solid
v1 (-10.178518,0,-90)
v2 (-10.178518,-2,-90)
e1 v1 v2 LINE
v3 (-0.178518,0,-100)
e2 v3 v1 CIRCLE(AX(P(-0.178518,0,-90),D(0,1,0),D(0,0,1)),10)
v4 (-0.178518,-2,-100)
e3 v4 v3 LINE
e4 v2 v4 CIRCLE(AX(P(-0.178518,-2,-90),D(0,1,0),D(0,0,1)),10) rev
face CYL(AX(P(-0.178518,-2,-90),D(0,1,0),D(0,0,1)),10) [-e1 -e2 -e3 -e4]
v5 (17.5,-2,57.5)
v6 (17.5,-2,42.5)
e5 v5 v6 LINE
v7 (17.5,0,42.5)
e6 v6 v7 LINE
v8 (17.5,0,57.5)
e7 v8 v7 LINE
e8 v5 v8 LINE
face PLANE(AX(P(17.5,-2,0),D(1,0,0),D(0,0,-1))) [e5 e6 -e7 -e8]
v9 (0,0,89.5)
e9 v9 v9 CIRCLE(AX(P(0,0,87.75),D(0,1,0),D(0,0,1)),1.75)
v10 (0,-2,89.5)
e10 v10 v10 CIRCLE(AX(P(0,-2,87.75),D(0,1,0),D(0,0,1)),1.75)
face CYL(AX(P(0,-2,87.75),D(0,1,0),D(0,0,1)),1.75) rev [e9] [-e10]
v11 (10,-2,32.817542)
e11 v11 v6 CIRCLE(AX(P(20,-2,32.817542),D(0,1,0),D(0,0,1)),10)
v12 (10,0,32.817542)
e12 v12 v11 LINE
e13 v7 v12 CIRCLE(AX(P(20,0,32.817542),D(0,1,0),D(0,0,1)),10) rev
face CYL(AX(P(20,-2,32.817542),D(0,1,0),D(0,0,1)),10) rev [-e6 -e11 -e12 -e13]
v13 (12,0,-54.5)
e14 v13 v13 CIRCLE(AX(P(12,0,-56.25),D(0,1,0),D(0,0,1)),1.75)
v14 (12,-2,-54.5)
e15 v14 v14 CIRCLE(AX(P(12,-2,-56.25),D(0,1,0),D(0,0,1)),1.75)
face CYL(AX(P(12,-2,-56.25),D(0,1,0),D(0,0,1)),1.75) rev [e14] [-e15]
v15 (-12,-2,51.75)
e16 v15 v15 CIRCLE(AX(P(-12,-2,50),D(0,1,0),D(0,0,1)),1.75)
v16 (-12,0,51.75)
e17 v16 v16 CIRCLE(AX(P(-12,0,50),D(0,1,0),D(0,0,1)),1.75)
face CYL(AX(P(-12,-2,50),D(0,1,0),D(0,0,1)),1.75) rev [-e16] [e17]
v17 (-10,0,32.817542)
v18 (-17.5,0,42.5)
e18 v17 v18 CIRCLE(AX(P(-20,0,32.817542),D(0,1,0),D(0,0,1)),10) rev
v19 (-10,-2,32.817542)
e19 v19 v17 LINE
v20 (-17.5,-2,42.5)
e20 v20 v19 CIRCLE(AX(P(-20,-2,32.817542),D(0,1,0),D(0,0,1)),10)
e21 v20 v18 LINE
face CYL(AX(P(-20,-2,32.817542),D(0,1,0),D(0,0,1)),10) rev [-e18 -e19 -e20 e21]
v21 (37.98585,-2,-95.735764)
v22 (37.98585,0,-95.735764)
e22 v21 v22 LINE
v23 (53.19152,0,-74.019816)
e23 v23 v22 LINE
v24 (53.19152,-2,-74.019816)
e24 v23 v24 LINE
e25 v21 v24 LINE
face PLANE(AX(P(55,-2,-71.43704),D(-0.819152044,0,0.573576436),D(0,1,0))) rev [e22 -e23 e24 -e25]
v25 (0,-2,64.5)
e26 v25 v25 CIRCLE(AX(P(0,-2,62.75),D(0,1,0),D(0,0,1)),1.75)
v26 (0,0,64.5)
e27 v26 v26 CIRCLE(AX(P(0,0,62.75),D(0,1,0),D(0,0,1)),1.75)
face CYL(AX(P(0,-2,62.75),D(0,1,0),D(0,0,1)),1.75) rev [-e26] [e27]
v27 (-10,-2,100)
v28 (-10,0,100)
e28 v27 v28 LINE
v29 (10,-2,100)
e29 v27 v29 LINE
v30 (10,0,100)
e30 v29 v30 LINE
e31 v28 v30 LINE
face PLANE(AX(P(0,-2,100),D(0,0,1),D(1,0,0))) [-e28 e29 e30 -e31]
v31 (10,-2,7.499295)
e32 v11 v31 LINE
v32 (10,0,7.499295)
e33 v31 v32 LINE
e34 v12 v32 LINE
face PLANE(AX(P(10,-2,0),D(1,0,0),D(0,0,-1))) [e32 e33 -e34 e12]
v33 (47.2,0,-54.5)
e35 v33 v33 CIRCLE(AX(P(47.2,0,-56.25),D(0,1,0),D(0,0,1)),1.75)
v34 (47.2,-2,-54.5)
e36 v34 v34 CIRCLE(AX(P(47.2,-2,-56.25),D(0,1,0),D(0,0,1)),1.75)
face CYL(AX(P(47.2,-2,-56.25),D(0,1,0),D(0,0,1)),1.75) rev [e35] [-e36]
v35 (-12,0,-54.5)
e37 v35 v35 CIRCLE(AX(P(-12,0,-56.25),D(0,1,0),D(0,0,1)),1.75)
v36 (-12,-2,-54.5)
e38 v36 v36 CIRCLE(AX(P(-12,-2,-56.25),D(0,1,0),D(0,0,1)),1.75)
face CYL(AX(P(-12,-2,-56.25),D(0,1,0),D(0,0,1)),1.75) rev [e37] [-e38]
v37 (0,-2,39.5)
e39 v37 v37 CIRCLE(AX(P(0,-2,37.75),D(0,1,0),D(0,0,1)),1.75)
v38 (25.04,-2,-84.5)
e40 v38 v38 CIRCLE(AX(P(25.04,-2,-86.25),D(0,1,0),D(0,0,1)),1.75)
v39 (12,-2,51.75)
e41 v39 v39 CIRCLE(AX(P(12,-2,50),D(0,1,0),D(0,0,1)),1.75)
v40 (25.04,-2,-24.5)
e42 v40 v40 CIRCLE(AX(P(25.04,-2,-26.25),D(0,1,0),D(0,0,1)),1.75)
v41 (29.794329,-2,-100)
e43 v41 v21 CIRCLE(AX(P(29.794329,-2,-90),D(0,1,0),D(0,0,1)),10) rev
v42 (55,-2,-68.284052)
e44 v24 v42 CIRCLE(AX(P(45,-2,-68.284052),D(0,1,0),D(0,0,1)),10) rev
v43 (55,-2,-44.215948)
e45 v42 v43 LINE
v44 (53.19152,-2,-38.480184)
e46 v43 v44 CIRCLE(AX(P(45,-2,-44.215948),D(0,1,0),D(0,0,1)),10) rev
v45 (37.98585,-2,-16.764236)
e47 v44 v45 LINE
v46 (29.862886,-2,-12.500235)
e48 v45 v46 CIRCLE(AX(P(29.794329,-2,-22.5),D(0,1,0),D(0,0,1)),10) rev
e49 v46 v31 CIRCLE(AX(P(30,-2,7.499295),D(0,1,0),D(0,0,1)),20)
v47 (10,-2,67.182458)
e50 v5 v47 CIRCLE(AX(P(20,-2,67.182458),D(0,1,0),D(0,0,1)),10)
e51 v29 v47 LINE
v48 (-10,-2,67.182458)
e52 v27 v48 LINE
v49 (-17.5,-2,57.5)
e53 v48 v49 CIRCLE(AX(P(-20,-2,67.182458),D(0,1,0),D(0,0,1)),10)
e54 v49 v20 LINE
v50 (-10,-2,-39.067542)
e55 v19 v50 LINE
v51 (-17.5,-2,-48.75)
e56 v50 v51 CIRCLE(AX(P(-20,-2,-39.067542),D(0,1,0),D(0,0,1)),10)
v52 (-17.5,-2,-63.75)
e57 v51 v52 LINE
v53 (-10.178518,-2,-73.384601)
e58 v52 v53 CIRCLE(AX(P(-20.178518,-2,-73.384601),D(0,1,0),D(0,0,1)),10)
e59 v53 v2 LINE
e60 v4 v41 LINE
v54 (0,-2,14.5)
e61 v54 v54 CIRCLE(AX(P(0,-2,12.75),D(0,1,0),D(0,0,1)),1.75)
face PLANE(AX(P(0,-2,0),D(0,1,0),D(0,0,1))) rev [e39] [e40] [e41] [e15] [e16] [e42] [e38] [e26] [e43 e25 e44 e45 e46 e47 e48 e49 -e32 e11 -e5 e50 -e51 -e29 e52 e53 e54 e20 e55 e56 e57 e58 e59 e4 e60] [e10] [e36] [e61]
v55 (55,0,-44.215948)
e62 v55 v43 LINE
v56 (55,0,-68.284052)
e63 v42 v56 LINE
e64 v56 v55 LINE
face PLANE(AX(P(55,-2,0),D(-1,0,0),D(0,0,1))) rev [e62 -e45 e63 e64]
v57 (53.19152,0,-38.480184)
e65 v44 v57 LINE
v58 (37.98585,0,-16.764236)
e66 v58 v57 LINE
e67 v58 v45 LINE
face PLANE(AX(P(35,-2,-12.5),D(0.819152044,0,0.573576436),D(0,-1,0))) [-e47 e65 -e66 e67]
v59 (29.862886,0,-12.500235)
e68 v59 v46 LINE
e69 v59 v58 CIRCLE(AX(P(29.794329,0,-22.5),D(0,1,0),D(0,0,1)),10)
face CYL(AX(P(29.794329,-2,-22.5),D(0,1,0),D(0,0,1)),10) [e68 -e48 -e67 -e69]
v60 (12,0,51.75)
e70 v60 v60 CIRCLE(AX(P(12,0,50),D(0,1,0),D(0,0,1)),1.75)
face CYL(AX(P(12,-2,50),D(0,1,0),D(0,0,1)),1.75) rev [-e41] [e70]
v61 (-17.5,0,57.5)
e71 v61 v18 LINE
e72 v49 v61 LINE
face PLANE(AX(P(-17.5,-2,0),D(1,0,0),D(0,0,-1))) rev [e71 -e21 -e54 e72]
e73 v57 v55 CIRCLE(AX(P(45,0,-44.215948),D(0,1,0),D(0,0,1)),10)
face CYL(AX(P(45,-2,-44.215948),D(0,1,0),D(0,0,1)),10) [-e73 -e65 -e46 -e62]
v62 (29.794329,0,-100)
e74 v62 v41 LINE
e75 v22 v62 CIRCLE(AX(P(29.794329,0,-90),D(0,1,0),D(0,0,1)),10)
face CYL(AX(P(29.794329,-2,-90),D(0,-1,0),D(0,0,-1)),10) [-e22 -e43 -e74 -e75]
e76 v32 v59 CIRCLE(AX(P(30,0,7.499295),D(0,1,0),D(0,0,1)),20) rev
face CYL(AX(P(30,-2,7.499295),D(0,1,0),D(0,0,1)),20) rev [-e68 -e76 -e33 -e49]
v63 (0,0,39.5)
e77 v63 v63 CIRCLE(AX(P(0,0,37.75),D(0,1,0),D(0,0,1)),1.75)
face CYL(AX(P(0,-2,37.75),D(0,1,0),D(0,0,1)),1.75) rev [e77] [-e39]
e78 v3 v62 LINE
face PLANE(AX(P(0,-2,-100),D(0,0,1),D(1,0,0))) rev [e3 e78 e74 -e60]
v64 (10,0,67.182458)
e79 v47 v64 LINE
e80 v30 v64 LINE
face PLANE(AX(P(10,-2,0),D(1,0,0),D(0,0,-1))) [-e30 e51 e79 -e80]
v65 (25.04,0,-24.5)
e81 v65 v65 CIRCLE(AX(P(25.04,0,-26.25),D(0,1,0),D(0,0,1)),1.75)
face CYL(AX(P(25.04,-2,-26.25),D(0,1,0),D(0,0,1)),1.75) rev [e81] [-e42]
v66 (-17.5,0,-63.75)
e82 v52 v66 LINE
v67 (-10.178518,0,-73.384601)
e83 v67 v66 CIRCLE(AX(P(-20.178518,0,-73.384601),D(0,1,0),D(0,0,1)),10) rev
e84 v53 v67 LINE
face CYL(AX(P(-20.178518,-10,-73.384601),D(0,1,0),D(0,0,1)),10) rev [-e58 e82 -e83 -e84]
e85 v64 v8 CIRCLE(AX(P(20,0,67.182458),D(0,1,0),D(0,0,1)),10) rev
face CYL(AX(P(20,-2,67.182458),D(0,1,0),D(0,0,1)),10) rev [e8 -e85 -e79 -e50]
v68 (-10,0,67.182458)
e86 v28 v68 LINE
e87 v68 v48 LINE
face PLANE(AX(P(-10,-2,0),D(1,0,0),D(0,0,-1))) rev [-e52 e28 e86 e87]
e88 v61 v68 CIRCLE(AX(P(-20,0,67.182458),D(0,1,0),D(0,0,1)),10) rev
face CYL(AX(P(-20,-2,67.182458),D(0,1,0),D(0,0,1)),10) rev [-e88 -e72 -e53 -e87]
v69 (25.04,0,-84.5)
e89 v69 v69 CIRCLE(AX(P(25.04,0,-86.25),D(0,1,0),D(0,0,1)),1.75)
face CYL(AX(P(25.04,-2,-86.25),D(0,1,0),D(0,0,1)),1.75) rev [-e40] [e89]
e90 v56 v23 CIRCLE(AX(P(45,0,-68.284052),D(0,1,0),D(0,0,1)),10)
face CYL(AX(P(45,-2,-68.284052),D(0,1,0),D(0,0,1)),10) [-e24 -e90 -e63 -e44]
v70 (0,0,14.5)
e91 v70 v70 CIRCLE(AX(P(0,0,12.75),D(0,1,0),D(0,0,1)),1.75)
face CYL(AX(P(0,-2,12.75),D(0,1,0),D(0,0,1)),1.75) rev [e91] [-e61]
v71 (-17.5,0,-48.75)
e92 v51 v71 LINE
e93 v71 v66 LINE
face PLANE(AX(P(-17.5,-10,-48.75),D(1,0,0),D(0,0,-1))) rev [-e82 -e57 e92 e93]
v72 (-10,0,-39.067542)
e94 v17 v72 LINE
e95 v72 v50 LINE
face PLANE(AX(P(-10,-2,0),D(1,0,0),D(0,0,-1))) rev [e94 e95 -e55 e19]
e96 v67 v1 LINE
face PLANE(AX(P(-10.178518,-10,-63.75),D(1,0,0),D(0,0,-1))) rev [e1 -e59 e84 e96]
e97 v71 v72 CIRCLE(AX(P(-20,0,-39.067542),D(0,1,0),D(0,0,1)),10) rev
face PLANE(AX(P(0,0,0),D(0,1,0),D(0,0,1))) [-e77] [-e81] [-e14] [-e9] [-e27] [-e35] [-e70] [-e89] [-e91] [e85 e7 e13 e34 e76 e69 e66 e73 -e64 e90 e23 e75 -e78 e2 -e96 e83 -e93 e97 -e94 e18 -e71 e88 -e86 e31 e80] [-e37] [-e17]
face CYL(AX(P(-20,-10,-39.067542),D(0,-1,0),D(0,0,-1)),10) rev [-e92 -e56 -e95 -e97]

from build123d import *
from OCP.BRepFilletAPI import BRepFilletAPI_MakeChamfer

# Parameters (mm, degrees)
SCHIZZO1_R                   = 1.75
ESTRUSIONE_ESTRUSIONE1_DEPTH = 2
SMUSSO1_SIZE                 = 20
SMUSSO1_SIZE2                = 28.562960135
TAGLIO_ESTRUSIONE1_DEPTH     = 10
RACCORDO1_R                  = 10
RACCORDO2_R                  = 20


with BuildPart() as part:
    # Schizzo1 → Estrusione-Estrusione1 (new body)
    with BuildSketch(Plane(origin=(0, 0, 0), x_dir=(1, 0, 0), z_dir=(0, 1, 0))):
        Polygon((-10, -57.5), (-10, -100), (10, -100), (10, -57.5), (17.5, -57.5), (17.5, -42.5), (10, -42.5), (10, 12.5), (55, 12.5), (55, 100), (10, 100), (-10, 100), (-30, 100), (-30, 12.5), (-10, 12.5), (-10, -42.5), (-17.5, -42.5), (-17.5, -57.5), align=None)
        with Locations(Location((0, -87.75, 0), (0, 0, 270))):
            Circle(SCHIZZO1_R, mode=Mode.SUBTRACT)
        with Locations(Location((0, -62.75, 0), (0, 0, 270))):
            Circle(SCHIZZO1_R, mode=Mode.SUBTRACT)
        with Locations(Location((-12, -50, 0), (0, 0, 270))):
            Circle(SCHIZZO1_R, mode=Mode.SUBTRACT)
        with Locations(Location((0, -37.75, 0), (0, 0, 270))):
            Circle(SCHIZZO1_R, mode=Mode.SUBTRACT)
        with Locations(Location((12, -50, 0), (0, 0, 270))):
            Circle(SCHIZZO1_R, mode=Mode.SUBTRACT)
        with Locations(Location((0, -12.75, 0), (0, 0, 270))):
            Circle(SCHIZZO1_R, mode=Mode.SUBTRACT)
        with Locations(Location((-12, 56.25, 0), (0, 0, 270))):
            Circle(SCHIZZO1_R, mode=Mode.SUBTRACT)
        with Locations(Location((12, 56.25, 0), (0, 0, 270))):
            Circle(SCHIZZO1_R, mode=Mode.SUBTRACT)
        with Locations(Location((25.04, 26.25, 0), (0, 0, 270))):
            Circle(SCHIZZO1_R, mode=Mode.SUBTRACT)
        with Locations(Location((25.04, 86.25, 0), (0, 0, 270))):
            Circle(SCHIZZO1_R, mode=Mode.SUBTRACT)
        with Locations(Location((47.2, 56.25, 0), (0, 0, 270))):
            Circle(SCHIZZO1_R, mode=Mode.SUBTRACT)
    extrude(amount=-ESTRUSIONE_ESTRUSIONE1_DEPTH)

    # Smusso1: one chamfer whose edges measure the first distance from different faces: ONE call of the kernel's chamfer builder (chamfer() names one face for all edges)
    smusso1_edges_1 = [part.edges().sort_by_distance(p)[0] for p in [
        (55, -1, -12.5),
    ]]
    smusso1_side_1 = [part.faces().sort_by_distance(p)[0] for p in [
        (32.5, -1, -12.5),
    ]]
    smusso1_edges_2 = [part.edges().sort_by_distance(p)[0] for p in [
        (55, -1, -100),
    ]]
    smusso1_side_2 = [part.faces().sort_by_distance(p)[0] for p in [
        (12.5, -1, -100),
    ]]
    smusso1 = BRepFilletAPI_MakeChamfer(part.part.solid().wrapped)
    for e in smusso1_edges_1:
        smusso1.Add(SMUSSO1_SIZE, SMUSSO1_SIZE2, e.wrapped, smusso1_side_1[0].wrapped)  # the first distance lies on this face
    for e in smusso1_edges_2:
        smusso1.Add(SMUSSO1_SIZE, SMUSSO1_SIZE2, e.wrapped, smusso1_side_2[0].wrapped)  # the first distance lies on this face
    add(Compound.cast(smusso1.Shape()), mode=Mode.REPLACE)

    # Schizzo2 → Taglio-Estrusione1 (cut)
    with BuildSketch(Plane(origin=(0, 0, 0), x_dir=(1, 0, 0), z_dir=(0, 1, 0))):
        Polygon((-10, 12.5), (-10, 48.75), (-17.5, 48.75), (-17.5, 63.75), (-10.178518111, 63.75), (-10.178518111, 100), (-33.809151811, 100), (-33.809151811, 12.5), align=None)
    extrude(amount=-TAGLIO_ESTRUSIONE1_DEPTH, mode=Mode.SUBTRACT)

    # Raccordo1
    # the kernel refuses this fillet: 10 mm, written as the material it adds along each edge
    with BuildSketch(Plane(origin=(10, 0, 42.5), x_dir=(0, 0, -1), z_dir=(0, -1, 0)), Plane(origin=(-10, 0, 57.5), x_dir=(0, 0, 1), z_dir=(0, -1, 0)), Plane(origin=(-10, 0, -48.75), x_dir=(0, 0, 1), z_dir=(0, -1, 0))) as raccordo1_piece_1:
        with BuildLine():
            CenterArc((9.682458366, 10), RACCORDO1_R, 194.477512186, 75.522487814)
            Line((0, 7.5), (0, 0))
            Line((0, 0), (9.682458366, 0))
        make_face()
    extrude(amount=2)
    with BuildSketch(Plane(origin=(-10, 0, 42.5), x_dir=(-1, 0, 0), z_dir=(0, -1, 0)), Plane(origin=(10, 0, 57.5), x_dir=(1, 0, 0), z_dir=(0, -1, 0))) as raccordo1_piece_2:
        with BuildLine():
            CenterArc((10, 9.682458366), RACCORDO1_R, 180, 75.522487814)
            Line((0, 9.682458366), (0, 0))
            Line((0, 0), (7.5, 0))
        make_face()
    extrude(amount=2)
    with BuildSketch(Plane(origin=(-10.178518111, 0, -63.75), x_dir=(-1, 0, 0), z_dir=(0, -1, 0))) as raccordo1_piece_3:
        with BuildLine():
            CenterArc((10, 9.634601223), RACCORDO1_R, 180, 74.463523002)
            Line((0, 9.634601223), (0, 0))
            Line((0, 0), (7.321481889, 0))
        make_face()
    extrude(amount=2)
    # the kernel refuses this fillet: 10 mm, written as the material it takes off along each edge
    with BuildSketch(Plane(origin=(35, 13.014176264, -12.5), x_dir=(-1, 0, 0), z_dir=(0, -1, 0)), Plane(origin=(35, 13.014176264, -100), x_dir=(0.5735764363510455, 0, 0.8191520442889922), z_dir=(0, -1, 0))) as raccordo1_2_piece_1:
        with BuildLine():
            CenterArc((RACCORDO1_R * 0.520567050552, RACCORDO1_R), RACCORDO1_R, 215, 55)
            Line((-RACCORDO1_R * 0.298584993737, RACCORDO1_R * 0.426423563649), (0, 0))
            Line((0, 0), (RACCORDO1_R * 0.520567050552, 0))
        make_face()
    extrude(amount=28.028352528, mode=Mode.SUBTRACT)
    with BuildSketch(Plane(origin=(55, 7.882469722, -41.062960135), x_dir=(-0.5735764363510429, 0, 0.819152044288994), z_dir=(0, -1, 0)), Plane(origin=(55, 7.882469722, -71.437039865), x_dir=(0, 0, 1), z_dir=(0, -1, 0))) as raccordo1_2_piece_2:
        with BuildLine():
            CenterArc((RACCORDO1_R * 0.315298788879, RACCORDO1_R), RACCORDO1_R, 235, 35)
            Line((-RACCORDO1_R * 0.258277647472, RACCORDO1_R * 0.180847955711), (0, 0))
            Line((0, 0), (RACCORDO1_R * 0.315298788879, 0))
        make_face()
    extrude(amount=17.764939444, mode=Mode.SUBTRACT)
    with BuildSketch(Plane(origin=(-10.178518111, 25, -100), x_dir=(1, 0, 0), z_dir=(0, -1, 0))) as raccordo1_2_piece_3:
        with BuildLine():
            CenterArc((RACCORDO1_R, RACCORDO1_R), RACCORDO1_R, 180, 90)
            Line((0, RACCORDO1_R), (0, 0))
            Line((0, 0), (RACCORDO1_R, 0))
        make_face()
    extrude(amount=52, mode=Mode.SUBTRACT)

    # Raccordo2
    raccordo2_edges = [part.edges().sort_by_distance(p)[0] for p in [
        (10, -1, -12.5),
    ]]
    fillet(raccordo2_edges, radius=RACCORDO2_R)


solid = part.part
